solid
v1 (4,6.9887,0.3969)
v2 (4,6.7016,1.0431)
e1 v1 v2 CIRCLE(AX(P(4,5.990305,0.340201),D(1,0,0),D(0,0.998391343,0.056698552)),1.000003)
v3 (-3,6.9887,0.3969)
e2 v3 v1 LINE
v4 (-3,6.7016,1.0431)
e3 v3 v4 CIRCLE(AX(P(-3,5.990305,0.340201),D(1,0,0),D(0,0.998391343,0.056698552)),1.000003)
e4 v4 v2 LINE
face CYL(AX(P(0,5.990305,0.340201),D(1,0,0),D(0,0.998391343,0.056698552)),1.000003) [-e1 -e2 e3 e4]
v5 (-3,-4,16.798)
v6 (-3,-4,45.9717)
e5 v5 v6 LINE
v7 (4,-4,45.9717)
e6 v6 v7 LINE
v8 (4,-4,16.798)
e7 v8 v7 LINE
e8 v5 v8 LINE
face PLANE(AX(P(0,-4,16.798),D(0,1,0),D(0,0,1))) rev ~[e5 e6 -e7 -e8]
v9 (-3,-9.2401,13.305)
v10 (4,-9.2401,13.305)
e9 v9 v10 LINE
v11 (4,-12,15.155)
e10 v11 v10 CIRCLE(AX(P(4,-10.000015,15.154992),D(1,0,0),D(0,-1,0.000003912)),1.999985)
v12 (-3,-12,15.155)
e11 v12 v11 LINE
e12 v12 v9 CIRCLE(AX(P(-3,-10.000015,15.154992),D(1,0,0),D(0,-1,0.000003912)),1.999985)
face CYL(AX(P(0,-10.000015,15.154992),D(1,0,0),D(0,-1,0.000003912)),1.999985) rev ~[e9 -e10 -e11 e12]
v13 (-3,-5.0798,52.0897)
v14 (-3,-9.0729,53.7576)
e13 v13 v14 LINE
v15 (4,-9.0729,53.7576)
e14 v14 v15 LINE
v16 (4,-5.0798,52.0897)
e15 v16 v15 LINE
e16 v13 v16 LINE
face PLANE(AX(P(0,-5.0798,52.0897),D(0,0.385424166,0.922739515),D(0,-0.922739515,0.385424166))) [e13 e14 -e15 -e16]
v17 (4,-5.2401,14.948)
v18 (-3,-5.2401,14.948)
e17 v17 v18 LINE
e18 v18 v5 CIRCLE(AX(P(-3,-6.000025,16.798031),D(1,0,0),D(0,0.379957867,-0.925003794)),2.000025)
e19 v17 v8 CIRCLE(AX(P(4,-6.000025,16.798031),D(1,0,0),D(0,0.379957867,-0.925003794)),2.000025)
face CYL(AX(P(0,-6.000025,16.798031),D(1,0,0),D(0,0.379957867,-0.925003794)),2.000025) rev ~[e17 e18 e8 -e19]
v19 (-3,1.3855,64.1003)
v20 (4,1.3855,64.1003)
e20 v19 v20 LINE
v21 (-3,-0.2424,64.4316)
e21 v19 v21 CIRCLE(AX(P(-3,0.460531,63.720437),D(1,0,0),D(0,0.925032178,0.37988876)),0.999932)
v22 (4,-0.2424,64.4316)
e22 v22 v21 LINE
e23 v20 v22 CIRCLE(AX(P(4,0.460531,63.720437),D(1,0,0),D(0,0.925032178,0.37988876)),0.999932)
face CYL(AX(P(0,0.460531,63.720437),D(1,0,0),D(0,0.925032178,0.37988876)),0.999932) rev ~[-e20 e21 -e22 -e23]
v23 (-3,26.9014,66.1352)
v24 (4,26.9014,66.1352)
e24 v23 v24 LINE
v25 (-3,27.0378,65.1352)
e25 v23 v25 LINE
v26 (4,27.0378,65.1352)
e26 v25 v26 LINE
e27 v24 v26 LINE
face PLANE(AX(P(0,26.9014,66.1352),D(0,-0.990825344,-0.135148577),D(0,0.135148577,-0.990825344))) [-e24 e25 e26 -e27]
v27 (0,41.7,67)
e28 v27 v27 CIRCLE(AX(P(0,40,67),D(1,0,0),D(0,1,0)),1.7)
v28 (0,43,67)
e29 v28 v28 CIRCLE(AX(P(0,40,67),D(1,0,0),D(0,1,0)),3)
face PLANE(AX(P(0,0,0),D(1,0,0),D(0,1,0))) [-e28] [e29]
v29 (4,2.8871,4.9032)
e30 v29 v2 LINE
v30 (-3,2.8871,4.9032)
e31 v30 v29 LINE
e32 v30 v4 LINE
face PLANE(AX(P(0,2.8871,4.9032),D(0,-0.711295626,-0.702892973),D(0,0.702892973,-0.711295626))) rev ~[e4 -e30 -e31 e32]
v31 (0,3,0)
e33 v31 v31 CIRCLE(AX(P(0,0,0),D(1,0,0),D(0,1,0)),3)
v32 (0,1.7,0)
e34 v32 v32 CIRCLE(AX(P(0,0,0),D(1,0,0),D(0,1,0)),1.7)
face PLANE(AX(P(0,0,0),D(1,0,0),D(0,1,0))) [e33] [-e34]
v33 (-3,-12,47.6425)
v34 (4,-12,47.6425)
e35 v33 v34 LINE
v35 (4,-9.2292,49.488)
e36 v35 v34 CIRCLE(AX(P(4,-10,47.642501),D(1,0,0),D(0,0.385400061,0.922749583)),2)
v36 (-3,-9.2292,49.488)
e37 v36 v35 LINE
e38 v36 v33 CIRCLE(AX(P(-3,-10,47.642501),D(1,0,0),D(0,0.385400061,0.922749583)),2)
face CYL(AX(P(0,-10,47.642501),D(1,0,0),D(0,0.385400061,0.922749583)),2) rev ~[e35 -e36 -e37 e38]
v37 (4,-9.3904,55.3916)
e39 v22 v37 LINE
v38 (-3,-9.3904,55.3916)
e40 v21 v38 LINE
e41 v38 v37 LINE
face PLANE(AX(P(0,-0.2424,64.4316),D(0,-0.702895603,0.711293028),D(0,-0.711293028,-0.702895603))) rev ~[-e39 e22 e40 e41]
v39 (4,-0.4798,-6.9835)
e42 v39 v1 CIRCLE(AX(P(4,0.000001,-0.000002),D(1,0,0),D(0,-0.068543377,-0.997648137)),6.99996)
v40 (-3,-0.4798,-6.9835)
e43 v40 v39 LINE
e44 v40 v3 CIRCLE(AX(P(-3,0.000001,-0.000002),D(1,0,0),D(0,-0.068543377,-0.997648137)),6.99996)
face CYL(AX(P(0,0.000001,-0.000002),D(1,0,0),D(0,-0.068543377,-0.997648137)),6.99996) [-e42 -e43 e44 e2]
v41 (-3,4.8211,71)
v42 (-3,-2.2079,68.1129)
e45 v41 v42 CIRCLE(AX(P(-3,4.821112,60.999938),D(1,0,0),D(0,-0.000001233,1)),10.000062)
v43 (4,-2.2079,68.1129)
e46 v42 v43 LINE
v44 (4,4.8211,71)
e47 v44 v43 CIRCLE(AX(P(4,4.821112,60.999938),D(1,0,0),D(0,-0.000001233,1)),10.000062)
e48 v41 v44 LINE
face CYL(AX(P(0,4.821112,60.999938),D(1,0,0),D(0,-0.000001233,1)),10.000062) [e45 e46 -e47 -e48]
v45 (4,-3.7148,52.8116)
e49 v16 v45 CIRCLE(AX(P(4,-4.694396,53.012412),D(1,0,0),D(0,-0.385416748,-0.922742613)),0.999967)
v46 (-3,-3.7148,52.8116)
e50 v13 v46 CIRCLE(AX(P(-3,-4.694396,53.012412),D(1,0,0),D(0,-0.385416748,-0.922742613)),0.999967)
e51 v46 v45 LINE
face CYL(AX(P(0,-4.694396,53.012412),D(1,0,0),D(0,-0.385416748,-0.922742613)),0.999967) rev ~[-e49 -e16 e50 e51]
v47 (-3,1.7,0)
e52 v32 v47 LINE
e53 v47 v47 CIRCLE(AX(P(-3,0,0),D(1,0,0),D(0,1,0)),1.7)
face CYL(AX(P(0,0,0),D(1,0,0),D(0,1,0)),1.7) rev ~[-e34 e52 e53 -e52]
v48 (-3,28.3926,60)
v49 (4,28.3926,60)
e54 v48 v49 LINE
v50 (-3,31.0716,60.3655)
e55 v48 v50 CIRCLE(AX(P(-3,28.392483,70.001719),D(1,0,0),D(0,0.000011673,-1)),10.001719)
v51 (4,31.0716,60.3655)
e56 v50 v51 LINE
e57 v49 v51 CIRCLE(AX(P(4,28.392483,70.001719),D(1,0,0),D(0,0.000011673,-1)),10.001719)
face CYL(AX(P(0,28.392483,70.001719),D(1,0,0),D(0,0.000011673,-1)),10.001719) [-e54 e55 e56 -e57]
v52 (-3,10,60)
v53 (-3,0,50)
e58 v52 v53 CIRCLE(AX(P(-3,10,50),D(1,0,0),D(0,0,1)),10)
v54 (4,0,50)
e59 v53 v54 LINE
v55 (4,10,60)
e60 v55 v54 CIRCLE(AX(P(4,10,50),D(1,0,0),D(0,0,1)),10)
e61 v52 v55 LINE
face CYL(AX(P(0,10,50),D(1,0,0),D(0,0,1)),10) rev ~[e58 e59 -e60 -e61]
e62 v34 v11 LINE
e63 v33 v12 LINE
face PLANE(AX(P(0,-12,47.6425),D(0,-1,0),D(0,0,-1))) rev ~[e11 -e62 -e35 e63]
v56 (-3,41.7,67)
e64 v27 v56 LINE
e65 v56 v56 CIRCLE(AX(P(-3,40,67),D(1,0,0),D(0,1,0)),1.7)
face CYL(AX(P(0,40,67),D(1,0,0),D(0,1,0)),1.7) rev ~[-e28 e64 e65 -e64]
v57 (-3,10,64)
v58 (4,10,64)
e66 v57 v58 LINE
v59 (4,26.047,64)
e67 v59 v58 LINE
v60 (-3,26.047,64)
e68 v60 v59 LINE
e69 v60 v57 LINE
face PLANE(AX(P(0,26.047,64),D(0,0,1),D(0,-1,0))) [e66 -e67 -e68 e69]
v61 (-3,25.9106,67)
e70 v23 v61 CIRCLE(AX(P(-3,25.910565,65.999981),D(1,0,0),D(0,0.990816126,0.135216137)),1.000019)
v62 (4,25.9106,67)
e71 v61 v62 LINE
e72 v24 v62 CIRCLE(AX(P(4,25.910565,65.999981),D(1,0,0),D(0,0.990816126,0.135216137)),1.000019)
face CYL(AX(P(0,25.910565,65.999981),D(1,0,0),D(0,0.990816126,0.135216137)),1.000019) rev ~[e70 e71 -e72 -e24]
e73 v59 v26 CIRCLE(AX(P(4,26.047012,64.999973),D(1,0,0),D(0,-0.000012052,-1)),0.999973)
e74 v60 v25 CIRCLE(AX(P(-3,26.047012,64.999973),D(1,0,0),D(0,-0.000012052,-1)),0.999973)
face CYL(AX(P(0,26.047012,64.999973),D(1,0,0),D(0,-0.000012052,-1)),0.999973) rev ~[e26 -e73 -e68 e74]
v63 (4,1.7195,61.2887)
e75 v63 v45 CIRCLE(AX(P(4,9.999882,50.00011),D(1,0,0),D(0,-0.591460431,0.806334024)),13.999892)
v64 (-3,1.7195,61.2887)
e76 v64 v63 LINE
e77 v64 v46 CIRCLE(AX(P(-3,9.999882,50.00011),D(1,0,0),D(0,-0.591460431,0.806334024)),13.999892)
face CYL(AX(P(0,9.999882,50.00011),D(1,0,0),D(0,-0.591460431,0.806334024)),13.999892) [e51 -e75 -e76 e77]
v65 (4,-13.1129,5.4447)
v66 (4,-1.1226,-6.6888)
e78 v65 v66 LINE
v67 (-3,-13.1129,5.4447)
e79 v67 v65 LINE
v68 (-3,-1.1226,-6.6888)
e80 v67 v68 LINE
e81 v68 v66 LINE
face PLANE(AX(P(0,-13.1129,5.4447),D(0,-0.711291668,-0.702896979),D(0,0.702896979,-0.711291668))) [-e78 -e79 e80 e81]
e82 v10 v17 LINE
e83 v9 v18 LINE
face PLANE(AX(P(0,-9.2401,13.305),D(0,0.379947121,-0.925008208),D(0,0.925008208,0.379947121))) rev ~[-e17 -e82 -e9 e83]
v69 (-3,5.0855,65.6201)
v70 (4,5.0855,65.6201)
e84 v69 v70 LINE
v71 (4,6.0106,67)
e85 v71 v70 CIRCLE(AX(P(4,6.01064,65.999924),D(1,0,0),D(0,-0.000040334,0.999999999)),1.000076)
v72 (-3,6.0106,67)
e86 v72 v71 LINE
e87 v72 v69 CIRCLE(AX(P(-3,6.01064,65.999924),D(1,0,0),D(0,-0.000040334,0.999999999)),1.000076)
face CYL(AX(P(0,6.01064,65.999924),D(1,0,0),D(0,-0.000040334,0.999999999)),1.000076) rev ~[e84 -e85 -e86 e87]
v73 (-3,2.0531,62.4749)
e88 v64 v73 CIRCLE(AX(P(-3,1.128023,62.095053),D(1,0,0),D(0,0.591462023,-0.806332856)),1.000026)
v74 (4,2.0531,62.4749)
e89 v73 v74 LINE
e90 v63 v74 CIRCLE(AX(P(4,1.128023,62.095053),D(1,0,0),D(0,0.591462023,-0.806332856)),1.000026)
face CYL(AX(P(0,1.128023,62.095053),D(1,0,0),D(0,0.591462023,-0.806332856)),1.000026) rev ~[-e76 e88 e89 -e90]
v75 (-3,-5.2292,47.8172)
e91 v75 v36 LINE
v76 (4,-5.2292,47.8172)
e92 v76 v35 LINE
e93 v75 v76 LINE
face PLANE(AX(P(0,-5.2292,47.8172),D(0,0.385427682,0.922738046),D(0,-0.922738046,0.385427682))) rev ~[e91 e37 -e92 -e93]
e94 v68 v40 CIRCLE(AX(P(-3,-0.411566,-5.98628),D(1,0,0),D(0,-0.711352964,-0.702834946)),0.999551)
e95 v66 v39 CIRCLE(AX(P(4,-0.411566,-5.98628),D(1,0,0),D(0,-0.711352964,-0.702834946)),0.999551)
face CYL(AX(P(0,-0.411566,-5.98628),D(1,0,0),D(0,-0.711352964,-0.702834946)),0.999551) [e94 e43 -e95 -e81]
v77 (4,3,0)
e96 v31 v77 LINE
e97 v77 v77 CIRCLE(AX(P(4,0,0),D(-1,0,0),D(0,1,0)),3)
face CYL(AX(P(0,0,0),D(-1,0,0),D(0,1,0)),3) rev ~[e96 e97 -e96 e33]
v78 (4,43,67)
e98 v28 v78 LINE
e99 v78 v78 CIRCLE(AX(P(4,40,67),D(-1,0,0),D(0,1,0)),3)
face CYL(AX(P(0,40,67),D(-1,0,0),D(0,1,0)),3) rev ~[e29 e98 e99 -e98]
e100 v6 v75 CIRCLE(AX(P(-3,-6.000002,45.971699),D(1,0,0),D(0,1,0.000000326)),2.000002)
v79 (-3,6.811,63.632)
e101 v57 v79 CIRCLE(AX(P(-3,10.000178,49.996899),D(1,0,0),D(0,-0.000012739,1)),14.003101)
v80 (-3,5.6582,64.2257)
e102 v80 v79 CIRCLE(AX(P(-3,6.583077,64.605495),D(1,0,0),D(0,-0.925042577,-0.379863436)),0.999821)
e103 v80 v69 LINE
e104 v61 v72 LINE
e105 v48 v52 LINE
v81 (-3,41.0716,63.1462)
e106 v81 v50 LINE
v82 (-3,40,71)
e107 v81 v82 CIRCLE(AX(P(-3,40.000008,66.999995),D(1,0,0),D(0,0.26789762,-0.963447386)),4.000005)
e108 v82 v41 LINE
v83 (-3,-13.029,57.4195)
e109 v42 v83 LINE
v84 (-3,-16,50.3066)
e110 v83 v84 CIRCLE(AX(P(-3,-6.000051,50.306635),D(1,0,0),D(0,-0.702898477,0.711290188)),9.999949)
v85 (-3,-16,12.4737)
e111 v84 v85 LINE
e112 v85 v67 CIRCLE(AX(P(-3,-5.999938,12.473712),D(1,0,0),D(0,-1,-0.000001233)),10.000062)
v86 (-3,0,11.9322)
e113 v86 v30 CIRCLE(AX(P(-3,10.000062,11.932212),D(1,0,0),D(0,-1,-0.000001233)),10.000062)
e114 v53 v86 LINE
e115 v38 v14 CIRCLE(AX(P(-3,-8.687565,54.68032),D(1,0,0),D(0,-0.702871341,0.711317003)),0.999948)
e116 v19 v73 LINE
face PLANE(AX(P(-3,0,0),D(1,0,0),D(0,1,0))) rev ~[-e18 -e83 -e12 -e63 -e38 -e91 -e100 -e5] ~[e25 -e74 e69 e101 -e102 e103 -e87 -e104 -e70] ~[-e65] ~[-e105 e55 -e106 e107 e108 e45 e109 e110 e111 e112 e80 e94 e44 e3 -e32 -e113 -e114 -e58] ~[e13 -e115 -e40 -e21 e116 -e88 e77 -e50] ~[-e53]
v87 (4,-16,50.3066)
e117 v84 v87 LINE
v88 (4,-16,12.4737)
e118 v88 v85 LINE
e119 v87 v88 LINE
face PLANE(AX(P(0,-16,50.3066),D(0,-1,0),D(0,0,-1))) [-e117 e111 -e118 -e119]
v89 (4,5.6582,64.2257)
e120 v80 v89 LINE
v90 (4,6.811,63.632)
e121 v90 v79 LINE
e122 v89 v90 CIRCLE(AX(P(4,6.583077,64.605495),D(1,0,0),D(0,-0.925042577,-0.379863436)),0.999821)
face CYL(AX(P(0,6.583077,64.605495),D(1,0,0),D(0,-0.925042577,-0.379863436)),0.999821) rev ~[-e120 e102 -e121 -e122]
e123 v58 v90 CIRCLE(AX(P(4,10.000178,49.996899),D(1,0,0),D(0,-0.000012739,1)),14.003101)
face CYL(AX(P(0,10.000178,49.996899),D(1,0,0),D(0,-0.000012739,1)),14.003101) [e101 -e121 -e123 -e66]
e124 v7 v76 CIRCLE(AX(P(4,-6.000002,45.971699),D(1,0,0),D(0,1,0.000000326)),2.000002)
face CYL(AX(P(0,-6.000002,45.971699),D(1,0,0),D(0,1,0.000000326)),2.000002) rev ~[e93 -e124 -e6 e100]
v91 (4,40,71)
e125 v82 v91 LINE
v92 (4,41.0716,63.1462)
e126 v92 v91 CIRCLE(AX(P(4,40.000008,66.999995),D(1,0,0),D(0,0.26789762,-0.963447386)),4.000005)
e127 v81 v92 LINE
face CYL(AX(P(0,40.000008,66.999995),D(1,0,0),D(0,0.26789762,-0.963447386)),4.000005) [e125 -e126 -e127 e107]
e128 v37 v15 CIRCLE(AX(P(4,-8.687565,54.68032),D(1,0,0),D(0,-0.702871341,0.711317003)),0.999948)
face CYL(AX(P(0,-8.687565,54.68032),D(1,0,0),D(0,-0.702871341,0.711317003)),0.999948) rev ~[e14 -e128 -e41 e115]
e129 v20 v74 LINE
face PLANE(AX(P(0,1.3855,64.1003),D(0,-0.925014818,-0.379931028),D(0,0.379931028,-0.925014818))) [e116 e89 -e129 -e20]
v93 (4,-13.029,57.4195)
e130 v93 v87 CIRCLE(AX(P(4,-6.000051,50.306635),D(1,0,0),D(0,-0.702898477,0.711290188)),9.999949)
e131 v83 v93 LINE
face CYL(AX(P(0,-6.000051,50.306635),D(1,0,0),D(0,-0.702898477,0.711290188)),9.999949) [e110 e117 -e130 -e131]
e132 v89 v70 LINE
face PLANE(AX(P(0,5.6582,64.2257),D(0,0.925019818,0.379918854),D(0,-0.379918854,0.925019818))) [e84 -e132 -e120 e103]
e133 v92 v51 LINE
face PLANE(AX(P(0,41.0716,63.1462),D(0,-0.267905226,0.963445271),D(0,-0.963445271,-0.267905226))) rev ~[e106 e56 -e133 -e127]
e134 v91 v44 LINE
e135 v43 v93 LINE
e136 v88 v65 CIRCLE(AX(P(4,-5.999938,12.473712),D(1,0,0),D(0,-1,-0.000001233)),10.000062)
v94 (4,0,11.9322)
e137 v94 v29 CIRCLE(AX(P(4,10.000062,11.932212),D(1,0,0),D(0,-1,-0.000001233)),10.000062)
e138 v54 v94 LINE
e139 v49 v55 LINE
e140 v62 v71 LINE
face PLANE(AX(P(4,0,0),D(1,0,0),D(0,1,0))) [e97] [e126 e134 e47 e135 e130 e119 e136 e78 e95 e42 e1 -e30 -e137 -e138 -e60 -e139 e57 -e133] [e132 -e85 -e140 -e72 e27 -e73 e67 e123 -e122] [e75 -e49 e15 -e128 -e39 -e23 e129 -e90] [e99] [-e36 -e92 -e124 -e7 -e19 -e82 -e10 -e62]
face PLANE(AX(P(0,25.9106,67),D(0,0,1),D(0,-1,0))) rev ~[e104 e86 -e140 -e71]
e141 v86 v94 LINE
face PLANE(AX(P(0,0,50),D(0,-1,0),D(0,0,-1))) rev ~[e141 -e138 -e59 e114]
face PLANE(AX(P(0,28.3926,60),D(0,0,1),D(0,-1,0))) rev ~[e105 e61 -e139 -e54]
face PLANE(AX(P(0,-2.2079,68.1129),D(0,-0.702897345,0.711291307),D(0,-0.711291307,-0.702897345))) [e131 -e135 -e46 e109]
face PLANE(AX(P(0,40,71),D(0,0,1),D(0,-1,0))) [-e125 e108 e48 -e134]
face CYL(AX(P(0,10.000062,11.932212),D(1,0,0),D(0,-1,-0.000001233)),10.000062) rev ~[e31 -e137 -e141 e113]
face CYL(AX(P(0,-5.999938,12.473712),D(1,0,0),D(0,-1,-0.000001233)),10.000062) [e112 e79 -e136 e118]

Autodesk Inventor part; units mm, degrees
ref_plane "YZ Plane" through (0, 0, 0) normal (1, 0, 0) x (0, 1, 0)
ref_plane "XZ Plane" through (0, 0, 0) normal (0, 1, 0) x (-1, 0, 0)
ref_plane "XY Plane" through (0, 0, 0) normal (0, 0, 1) x (1, 0, 0)
sketch "SwingArm A" plane through (0, 0, 0) normal (0, 0, 1) x (1, 0, 0)
  line L0 (-13.1129, 5.4447) -> (-1.1226, -6.6888)
  arc A0 (6.9887, 0.3969) -> (6.7016, 1.0431) centre (5.9903, 0.3402) ccw
  arc A1 (-1.1226, -6.6888) -> (-0.4798, -6.9835) centre (-0.4113, -5.9859) ccw
  line L1 (40, 71) -> (4.8211, 71)
  line L2 (28.3926, 60) -> (0, 60) construction
  line L3 (-2.2079, 68.1129) -> (-13.029, 57.4195)
  line L4 (-16, 50.3066) -> (-16, 12.4737)
  line L5 (0, 60) -> (0, 11.9322) construction
  line L6 (2.8871, 4.9032) -> (6.7016, 1.0431)
  circle A2 centre (0, 0) radius 1.7
  circle A3 centre (40, 67) radius 1.7
  line L7 (40, 67) -> (-8, 67) construction
  line L8 (-8, 67) -> (-8, 8.0955) construction
  line L9 (-8, 8.0955) -> (0, 0) construction
  line L10 (41.0716, 63.1462) -> (31.0716, 60.3655)
  arc A4 (28.3926, 60) -> (31.0716, 60.3655) centre (28.3926, 70) ccw
  circle A5 centre (40, 67) radius 4 construction
  arc A6 (41.0716, 63.1462) -> (40, 71) centre (40, 67) ccw
  circle A7 centre (0, 0) radius 5.5 construction
  arc A8 (10, 60) -> (0, 50) centre (10, 50) ccw
  arc A9 (0, 11.9322) -> (2.8871, 4.9032) centre (10, 11.9322) ccw
  arc A10 (-16, 12.4737) -> (-13.1129, 5.4447) centre (-6, 12.4737) ccw
  arc A11 (-13.029, 57.4195) -> (-16, 50.3066) centre (-6, 50.3066) ccw
  arc A12 (4.8211, 71) -> (-2.2079, 68.1129) centre (4.8211, 61) ccw
  line L11 (-9.2401, 13.305) -> (-5.2401, 14.948)
  line L12 (-4, 16.798) -> (-4, 45.9717)
  line L13 (-5.2292, 47.8172) -> (-9.2292, 49.488)
  line L14 (-12, 47.6425) -> (-12, 15.155)
  arc A13 (-4, 45.9717) -> (-5.2292, 47.8172) centre (-6, 45.9717) ccw
  arc A14 (-9.2292, 49.488) -> (-12, 47.6425) centre (-10, 47.6425) ccw
  arc A15 (-5.2401, 14.948) -> (-4, 16.798) centre (-6, 16.798) ccw
  arc A16 (-12, 15.155) -> (-9.2401, 13.305) centre (-10, 15.155) ccw
  line L15 (28.3926, 60) -> (10, 60)
  line L16 (0, 50) -> (0, 11.9322)
  line L17 (1.3855, 64.1003) -> (2.0531, 62.4749)
  line L18 (-5.0798, 52.0897) -> (-9.0729, 53.7576)
  line L19 (-0.2424, 64.4316) -> (-9.3904, 55.3916)
  arc A17 (1.7195, 61.2887) -> (2.0531, 62.4749) centre (1.1281, 62.095) ccw
  arc A18 (1.3855, 64.1003) -> (-0.2424, 64.4316) centre (0.4605, 63.7204) ccw
  arc A19 (-5.0798, 52.0897) -> (-3.7148, 52.8116) centre (-4.6944, 53.0125) ccw
  arc A20 (-9.3904, 55.3916) -> (-9.0729, 53.7576) centre (-8.6875, 54.6803) ccw
  line L20 (-15.2274, 54.1608) -> (0, 47.8005) construction
  arc A21 (-0.4798, -6.9835) -> (6.9887, 0.3969) centre (0, 0) ccw
  arc A22 (1.7195, 61.2887) -> (-3.7148, 52.8116) centre (10, 50) ccw
  line L21 (0.0419, 2.0916) -> (2.8931, -0.7936) construction
  arc A23 (0.7592, -2.9023) -> (2.8931, -0.7936) centre (0, 0) ccw construction
  line L22 (0.7592, -2.9023) -> (-10.2677, 8.2563) construction
  arc A24 (-12, 12.4737) -> (-10.2677, 8.2563) centre (-6, 12.4737) ccw construction
  line L23 (-12, 12.4737) -> (-12, 50.3066) construction
  arc A25 (-10.2174, 54.5744) -> (-12, 50.3066) centre (-6, 50.3066) ccw construction
  line L24 (-10.2174, 54.5744) -> (0.6037, 65.2677) construction
  arc A26 (4.8211, 67) -> (0.6037, 65.2677) centre (4.8211, 61) ccw construction
  line L25 (4.8211, 67) -> (40, 67) construction
  line L26 (40, 67) -> (30, 64.2193) construction
  arc A27 (28.3926, 64) -> (30, 64.2193) centre (28.3926, 70) ccw construction
  line L27 (28.3926, 64) -> (10, 64) construction
  arc A28 (10, 64) -> (-4, 50) centre (10, 50) ccw construction
  line L28 (-4, 50) -> (-4, 11.9322) construction
  arc A29 (-4, 11.9322) -> (0.0419, 2.0916) centre (10, 11.9322) ccw construction
  line L29 (-15.2501, 8.6743) -> (0, 14.9381) construction
  line L30 (1.0217, 70.2501) -> (5.6423, 59.0006) construction
  line L31 (29.7445, 60.0918) -> (28.2561, 71) construction
  line L32 (5.6582, 64.2257) -> (5.0855, 65.6201)
  line L33 (26.9014, 66.1352) -> (27.0378, 65.1352)
  line L34 (25.9106, 67) -> (6.0106, 67)
  line L35 (26.047, 64) -> (10, 64)
  arc A30 (10, 64) -> (6.811, 63.632) centre (10, 50) ccw
  arc A31 (5.6582, 64.2257) -> (6.811, 63.632) centre (6.5833, 64.6057) ccw
  arc A32 (6.0106, 67) -> (5.0855, 65.6201) centre (6.0106, 66) ccw
  arc A33 (26.9014, 66.1352) -> (25.9106, 67) centre (25.9106, 66) ccw
  arc A34 (26.047, 64) -> (27.0378, 65.1352) centre (26.047, 65) ccw
  point P0 (-12, 31.3902)
  point P1 (-16, 31.3902)
  dimension "d0" = 3.4
  dimension "d1" = 3.4
  dimension "d2" = 7
  dimension "d3" = 4
  dimension "d6" = 10
  dimension "d7" = 16
  dimension "d8" = 67
  dimension "d9" = 10
  dimension "d10" = 10
  dimension "d11" = 10
  dimension "d12" = 10
  dimension "d13" = 10
  dimension "d14" = 40
  dimension "d15" = 134.66
  dimension "d16" = 2
  dimension "d17" = 2
  dimension "d18" = 1
  dimension "d20" = 4
  dimension "d24" = 10
  dimension "d25" = 50
  dimension "d32" = 7
  dimension "d33" = 11
  dimension "d34" = 1
  dimension "d35" = 4
  dimension "d37" = 2
  dimension "d38" = 4
  dimension "d39" = 1
  dimension "d41" = 2
  dimension "d42" = 1
  dimension "d43" = 1
sketch "Skizze1" plane through (0, 0, 0) normal (1, 0, 0) x (0, 1, 0)
  circle A0 centre (40, 67) radius 3
  circle A1 centre (0, 0) radius 3
  line L0 (-13.1129, 5.4447) -> (-1.1226, -6.6888)
  arc A2 (6.9887, 0.3969) -> (6.7016, 1.0431) centre (5.9903, 0.3402) ccw
  arc A3 (-1.1226, -6.6888) -> (-0.4798, -6.9835) centre (-0.4113, -5.9859) ccw
  line L1 (40, 71) -> (4.8211, 71)
  line L2 (28.3926, 60) -> (0, 60) construction
  line L3 (-2.2079, 68.1129) -> (-13.029, 57.4195)
  line L4 (-16, 50.3066) -> (-16, 12.4737)
  line L5 (0, 60) -> (0, 11.9322) construction
  line L6 (2.8871, 4.9032) -> (6.7016, 1.0431)
  circle A4 centre (0, 0) radius 1.7
  circle A5 centre (40, 67) radius 1.7
  line L7 (40, 67) -> (-8, 67) construction
  line L8 (-8, 67) -> (-8, 8.0955) construction
  line L9 (-8, 8.0955) -> (0, 0) construction
  line L10 (41.0716, 63.1462) -> (31.0716, 60.3655)
  arc A6 (28.3926, 60) -> (31.0716, 60.3655) centre (28.3926, 70) ccw
  circle A7 centre (40, 67) radius 4 construction
  arc A8 (41.0716, 63.1462) -> (40, 71) centre (40, 67) ccw
  circle A9 centre (0, 0) radius 5.5 construction
  arc A10 (10, 60) -> (0, 50) centre (10, 50) ccw
  arc A11 (0, 11.9322) -> (2.8871, 4.9032) centre (10, 11.9322) ccw
  arc A12 (-16, 12.4737) -> (-13.1129, 5.4447) centre (-6, 12.4737) ccw
  arc A13 (-13.029, 57.4195) -> (-16, 50.3066) centre (-6, 50.3066) ccw
  arc A14 (4.8211, 71) -> (-2.2079, 68.1129) centre (4.8211, 61) ccw
  line L11 (-9.2401, 13.305) -> (-5.2401, 14.948)
  line L12 (-4, 16.798) -> (-4, 45.9717)
  line L13 (-5.2292, 47.8172) -> (-9.2292, 49.488)
  line L14 (-12, 47.6425) -> (-12, 15.155)
  arc A15 (-4, 45.9717) -> (-5.2292, 47.8172) centre (-6, 45.9717) ccw
  arc A16 (-9.2292, 49.488) -> (-12, 47.6425) centre (-10, 47.6425) ccw
  arc A17 (-5.2401, 14.948) -> (-4, 16.798) centre (-6, 16.798) ccw
  arc A18 (-12, 15.155) -> (-9.2401, 13.305) centre (-10, 15.155) ccw
  line L15 (28.3926, 60) -> (10, 60)
  line L16 (0, 50) -> (0, 11.9322)
  line L17 (1.3855, 64.1003) -> (2.0531, 62.4749)
  line L18 (-5.0798, 52.0897) -> (-9.0729, 53.7576)
  line L19 (-0.2424, 64.4316) -> (-9.3904, 55.3916)
  arc A19 (1.7195, 61.2887) -> (2.0531, 62.4749) centre (1.1281, 62.095) ccw
  arc A20 (1.3855, 64.1003) -> (-0.2424, 64.4316) centre (0.4605, 63.7204) ccw
  arc A21 (-5.0798, 52.0897) -> (-3.7148, 52.8116) centre (-4.6944, 53.0125) ccw
  arc A22 (-9.3904, 55.3916) -> (-9.0729, 53.7576) centre (-8.6875, 54.6803) ccw
  line L20 (-15.2274, 54.1608) -> (0, 47.8005) construction
  arc A23 (-0.4798, -6.9835) -> (6.9887, 0.3969) centre (0, 0) ccw
  arc A24 (1.7195, 61.2887) -> (-3.7148, 52.8116) centre (10, 50) ccw
  line L21 (0.0419, 2.0916) -> (2.8931, -0.7936) construction
  arc A25 (0.7592, -2.9023) -> (2.8931, -0.7936) centre (0, 0) ccw construction
  line L22 (0.7592, -2.9023) -> (-10.2677, 8.2563) construction
  arc A26 (-12, 12.4737) -> (-10.2677, 8.2563) centre (-6, 12.4737) ccw construction
  line L23 (-12, 12.4737) -> (-12, 50.3066) construction
  arc A27 (-10.2174, 54.5744) -> (-12, 50.3066) centre (-6, 50.3066) ccw construction
  line L24 (-10.2174, 54.5744) -> (0.6037, 65.2677) construction
  arc A28 (4.8211, 67) -> (0.6037, 65.2677) centre (4.8211, 61) ccw construction
  line L25 (4.8211, 67) -> (40, 67) construction
  line L26 (40, 67) -> (30, 64.2193) construction
  arc A29 (28.3926, 64) -> (30, 64.2193) centre (28.3926, 70) ccw construction
  line L27 (28.3926, 64) -> (10, 64) construction
  arc A30 (10, 64) -> (-4, 50) centre (10, 50) ccw construction
  line L28 (-4, 50) -> (-4, 11.9322) construction
  arc A31 (-4, 11.9322) -> (0.0419, 2.0916) centre (10, 11.9322) ccw construction
  line L29 (-15.2501, 8.6743) -> (0, 14.9381) construction
  line L30 (1.0217, 70.2501) -> (5.6423, 59.0006) construction
  line L31 (29.7445, 60.0918) -> (28.2561, 71) construction
  line L32 (5.6582, 64.2257) -> (5.0855, 65.6201)
  line L33 (26.9014, 66.1352) -> (27.0378, 65.1352)
  line L34 (25.9106, 67) -> (6.0106, 67)
  line L35 (26.047, 64) -> (10, 64)
  arc A32 (10, 64) -> (6.811, 63.632) centre (10, 50) ccw
  arc A33 (5.6582, 64.2257) -> (6.811, 63.632) centre (6.5833, 64.6057) ccw
  arc A34 (6.0106, 67) -> (5.0855, 65.6201) centre (6.0106, 66) ccw
  arc A35 (26.9014, 66.1352) -> (25.9106, 67) centre (25.9106, 66) ccw
  arc A36 (26.047, 64) -> (27.0378, 65.1352) centre (26.047, 65) ccw
  dimension "d44" = 6
  dimension "d45" = 6
extrude "Extrusion1" add sketch "Skizze1" along normal blind 4 and the other way blind 3 contours A0 | A1 | A12 L4 A13 L3 A14 L1 A8 L10 A6 L15 A10 L16 A11 L6 A2 A23 A3 L0
extrude "Extrusion2" cut sketch "Skizze1" along normal through all contours A0 | A1
properties part number "Swing-Arm A" material "ABS-Kunststoff"
